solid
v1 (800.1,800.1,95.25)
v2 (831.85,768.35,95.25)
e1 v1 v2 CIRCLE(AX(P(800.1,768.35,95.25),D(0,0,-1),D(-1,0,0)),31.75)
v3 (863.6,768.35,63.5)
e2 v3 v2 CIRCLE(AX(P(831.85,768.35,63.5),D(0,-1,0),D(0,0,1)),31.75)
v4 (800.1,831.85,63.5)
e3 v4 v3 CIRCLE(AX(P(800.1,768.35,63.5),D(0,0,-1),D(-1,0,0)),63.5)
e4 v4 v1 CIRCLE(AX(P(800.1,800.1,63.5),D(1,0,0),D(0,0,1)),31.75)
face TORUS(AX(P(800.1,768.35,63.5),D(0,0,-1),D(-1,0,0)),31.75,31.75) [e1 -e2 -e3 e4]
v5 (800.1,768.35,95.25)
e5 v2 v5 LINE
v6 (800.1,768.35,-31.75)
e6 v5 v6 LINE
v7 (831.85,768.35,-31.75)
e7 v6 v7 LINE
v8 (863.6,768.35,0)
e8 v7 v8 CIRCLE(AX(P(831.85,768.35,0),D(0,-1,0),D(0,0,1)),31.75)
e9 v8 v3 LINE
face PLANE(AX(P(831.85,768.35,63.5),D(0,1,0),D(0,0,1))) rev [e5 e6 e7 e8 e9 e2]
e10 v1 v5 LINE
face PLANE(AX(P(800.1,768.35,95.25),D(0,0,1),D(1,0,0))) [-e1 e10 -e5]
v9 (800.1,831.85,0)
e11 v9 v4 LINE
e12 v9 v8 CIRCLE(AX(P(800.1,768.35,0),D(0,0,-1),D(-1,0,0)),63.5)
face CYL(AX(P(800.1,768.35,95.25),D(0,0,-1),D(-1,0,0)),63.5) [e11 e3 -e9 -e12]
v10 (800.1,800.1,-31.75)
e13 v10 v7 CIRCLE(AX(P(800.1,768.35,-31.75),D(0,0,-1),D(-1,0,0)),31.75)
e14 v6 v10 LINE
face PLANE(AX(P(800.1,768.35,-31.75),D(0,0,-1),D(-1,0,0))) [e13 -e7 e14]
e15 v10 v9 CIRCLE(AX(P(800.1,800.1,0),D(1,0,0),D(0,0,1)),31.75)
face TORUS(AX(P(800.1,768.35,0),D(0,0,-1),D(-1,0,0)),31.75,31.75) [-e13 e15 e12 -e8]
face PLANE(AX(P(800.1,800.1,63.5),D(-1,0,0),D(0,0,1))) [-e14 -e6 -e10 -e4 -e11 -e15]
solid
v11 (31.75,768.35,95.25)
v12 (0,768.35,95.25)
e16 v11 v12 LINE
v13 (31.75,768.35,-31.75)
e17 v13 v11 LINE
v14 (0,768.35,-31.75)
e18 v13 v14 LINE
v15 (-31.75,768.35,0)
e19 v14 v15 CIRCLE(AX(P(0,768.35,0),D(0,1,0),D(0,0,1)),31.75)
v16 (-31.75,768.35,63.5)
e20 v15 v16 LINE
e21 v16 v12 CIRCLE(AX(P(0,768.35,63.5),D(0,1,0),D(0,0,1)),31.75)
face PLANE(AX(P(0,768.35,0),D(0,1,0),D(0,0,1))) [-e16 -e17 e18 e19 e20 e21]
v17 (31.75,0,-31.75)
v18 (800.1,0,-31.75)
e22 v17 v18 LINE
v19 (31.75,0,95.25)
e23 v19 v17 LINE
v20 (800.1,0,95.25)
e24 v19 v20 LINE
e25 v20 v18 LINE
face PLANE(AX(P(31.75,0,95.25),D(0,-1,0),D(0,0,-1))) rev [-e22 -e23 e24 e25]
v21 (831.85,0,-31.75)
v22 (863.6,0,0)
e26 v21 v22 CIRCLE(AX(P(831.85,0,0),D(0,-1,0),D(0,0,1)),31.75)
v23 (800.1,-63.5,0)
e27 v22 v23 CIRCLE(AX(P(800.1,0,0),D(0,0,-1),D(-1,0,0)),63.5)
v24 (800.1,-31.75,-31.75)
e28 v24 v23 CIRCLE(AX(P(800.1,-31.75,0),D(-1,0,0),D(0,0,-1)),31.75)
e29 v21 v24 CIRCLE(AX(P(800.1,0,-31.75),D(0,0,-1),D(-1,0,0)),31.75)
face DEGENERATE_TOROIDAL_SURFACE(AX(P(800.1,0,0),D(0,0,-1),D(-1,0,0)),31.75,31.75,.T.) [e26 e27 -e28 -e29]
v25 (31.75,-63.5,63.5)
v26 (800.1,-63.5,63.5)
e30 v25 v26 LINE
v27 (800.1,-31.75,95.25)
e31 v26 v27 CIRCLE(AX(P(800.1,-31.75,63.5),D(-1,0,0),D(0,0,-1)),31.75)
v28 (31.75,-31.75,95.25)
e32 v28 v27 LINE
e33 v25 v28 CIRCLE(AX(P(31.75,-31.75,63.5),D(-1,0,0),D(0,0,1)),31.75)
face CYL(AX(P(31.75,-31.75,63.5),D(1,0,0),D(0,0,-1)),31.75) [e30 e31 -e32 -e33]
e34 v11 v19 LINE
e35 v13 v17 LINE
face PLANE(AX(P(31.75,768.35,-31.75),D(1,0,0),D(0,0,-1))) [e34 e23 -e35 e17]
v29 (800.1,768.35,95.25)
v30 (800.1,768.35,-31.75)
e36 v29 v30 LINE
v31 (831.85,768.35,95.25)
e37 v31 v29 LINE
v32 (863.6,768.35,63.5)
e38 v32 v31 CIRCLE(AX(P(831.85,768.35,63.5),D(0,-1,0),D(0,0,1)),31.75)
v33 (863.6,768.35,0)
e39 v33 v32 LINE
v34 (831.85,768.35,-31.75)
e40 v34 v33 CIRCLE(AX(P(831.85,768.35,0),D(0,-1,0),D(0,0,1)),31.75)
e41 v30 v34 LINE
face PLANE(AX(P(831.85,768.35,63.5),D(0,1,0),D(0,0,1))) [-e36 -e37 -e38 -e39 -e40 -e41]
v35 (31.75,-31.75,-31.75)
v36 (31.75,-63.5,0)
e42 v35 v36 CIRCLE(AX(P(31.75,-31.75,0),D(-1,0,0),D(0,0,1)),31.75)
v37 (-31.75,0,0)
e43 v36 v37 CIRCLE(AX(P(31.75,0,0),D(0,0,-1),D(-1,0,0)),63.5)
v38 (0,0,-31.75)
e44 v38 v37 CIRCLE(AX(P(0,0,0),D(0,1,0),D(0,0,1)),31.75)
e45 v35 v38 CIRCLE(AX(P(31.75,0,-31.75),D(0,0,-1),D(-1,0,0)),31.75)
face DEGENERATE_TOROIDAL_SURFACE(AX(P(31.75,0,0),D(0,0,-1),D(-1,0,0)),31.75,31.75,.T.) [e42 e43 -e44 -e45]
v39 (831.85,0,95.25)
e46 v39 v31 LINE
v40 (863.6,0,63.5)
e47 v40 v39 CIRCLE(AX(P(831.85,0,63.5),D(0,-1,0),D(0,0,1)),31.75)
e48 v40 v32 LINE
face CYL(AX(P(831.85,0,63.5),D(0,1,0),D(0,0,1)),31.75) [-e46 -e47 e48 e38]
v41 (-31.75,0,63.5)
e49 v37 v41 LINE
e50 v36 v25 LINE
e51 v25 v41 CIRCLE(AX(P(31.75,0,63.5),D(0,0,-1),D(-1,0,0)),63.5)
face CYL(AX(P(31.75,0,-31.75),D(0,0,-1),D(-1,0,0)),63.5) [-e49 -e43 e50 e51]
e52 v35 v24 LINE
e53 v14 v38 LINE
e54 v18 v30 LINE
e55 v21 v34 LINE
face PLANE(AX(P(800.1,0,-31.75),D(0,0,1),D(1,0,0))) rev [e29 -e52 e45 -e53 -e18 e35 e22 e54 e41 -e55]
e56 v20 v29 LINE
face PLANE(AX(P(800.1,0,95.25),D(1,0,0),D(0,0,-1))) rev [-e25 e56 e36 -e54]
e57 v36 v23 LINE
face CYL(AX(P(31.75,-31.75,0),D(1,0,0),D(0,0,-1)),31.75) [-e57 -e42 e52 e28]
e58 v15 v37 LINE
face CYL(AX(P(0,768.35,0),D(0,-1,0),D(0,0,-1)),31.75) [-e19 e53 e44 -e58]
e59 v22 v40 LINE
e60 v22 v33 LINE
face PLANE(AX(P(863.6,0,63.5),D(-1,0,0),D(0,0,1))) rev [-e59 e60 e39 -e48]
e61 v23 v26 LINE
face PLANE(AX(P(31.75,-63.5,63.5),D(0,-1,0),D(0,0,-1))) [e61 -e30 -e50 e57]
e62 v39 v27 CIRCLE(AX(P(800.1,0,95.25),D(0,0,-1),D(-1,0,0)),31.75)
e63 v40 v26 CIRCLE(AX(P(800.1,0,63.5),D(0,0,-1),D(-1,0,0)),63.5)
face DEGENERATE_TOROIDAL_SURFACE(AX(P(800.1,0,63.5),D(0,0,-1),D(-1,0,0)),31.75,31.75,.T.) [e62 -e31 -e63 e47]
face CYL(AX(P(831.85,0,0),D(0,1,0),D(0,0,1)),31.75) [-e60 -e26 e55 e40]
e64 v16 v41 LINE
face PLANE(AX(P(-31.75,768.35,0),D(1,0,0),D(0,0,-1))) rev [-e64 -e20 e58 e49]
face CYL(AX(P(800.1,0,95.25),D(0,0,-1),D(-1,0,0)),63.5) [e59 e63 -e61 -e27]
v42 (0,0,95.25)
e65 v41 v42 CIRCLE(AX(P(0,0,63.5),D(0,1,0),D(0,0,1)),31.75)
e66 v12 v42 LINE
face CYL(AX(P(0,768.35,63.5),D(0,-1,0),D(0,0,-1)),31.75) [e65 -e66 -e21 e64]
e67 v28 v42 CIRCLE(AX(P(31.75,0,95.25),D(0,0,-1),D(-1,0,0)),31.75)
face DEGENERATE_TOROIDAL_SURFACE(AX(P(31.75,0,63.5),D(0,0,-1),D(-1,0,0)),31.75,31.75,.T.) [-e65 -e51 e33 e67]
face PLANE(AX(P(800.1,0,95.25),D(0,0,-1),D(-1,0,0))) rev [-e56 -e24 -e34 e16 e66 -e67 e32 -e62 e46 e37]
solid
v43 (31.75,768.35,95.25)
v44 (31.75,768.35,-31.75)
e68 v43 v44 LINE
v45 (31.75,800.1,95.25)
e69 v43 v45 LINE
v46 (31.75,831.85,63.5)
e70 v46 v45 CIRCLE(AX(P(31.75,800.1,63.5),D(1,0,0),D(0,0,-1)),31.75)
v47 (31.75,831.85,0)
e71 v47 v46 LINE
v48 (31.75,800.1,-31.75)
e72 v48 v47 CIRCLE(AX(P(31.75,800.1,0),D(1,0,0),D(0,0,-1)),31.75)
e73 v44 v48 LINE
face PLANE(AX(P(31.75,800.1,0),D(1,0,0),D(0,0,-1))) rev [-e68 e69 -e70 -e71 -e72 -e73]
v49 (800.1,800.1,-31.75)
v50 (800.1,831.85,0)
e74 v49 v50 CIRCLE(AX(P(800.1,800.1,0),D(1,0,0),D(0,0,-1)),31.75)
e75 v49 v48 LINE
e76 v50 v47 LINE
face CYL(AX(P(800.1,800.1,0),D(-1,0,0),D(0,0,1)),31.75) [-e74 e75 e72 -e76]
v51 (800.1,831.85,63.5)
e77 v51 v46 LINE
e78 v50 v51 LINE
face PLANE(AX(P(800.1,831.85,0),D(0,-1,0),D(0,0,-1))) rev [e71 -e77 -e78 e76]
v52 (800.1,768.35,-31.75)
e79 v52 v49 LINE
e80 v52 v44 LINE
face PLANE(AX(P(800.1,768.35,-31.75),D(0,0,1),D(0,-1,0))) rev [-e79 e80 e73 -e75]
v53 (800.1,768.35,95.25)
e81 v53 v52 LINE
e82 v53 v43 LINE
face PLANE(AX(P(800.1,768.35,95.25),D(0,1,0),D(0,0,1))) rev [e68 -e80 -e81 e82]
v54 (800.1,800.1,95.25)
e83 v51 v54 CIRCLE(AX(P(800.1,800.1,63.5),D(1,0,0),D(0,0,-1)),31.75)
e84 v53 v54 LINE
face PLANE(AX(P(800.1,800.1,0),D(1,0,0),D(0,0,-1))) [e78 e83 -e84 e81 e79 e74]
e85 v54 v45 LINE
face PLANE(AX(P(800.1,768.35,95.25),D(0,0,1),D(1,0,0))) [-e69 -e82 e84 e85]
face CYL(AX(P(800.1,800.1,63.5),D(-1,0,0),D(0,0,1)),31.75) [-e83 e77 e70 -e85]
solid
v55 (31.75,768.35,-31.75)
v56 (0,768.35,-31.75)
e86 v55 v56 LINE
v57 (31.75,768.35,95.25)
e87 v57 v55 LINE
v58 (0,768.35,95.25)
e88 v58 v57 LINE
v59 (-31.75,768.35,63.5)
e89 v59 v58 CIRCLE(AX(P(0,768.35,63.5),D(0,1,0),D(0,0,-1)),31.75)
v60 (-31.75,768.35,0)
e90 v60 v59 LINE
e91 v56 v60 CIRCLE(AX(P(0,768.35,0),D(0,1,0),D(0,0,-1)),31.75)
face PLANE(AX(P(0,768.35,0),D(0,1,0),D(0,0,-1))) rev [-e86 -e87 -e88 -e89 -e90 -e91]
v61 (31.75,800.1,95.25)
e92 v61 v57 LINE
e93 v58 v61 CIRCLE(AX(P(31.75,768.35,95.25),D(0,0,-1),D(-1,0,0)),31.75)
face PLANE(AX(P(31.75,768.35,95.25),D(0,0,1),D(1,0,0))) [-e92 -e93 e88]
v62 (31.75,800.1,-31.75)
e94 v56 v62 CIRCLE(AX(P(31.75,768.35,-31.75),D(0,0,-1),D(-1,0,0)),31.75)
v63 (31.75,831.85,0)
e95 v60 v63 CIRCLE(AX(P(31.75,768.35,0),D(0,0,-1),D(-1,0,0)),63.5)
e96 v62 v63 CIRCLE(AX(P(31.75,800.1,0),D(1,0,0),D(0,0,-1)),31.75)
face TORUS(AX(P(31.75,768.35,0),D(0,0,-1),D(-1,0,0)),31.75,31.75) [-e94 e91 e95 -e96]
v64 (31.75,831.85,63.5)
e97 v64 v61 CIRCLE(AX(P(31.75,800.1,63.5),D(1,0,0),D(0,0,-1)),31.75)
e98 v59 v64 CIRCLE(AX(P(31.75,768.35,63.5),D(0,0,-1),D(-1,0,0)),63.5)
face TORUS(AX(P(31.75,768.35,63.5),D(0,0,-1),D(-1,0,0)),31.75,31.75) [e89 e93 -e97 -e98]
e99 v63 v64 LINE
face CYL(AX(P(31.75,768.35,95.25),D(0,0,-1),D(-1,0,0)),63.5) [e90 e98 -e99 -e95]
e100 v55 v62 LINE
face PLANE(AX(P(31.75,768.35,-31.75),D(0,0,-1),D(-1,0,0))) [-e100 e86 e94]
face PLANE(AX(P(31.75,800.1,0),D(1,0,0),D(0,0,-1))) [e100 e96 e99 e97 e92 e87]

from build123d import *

# Parameters (mm, degrees)
BOSS_EXTRUDE1_DEPTH = 768.35
BOSS_EXTRUDE2_DEPTH = 768.35
BOSS_EXTRUDE3_DEPTH = 768.35
BOSS_EXTRUDE4_DEPTH = 768.35
REVOLVE2_ANGLE      = 90
REVOLVE3_ANGLE      = 90
REVOLVE8_ANGLE      = 90
REVOLVE10_ANGLE     = 90


# Read off the part's stored shape, not the designer's step: Revolve2, Revolve3
with BuildPart() as part:
    # Sketch2 → Boss-Extrude1 (new body)
    with BuildSketch(Plane(origin=(0, 0, 0), x_dir=(1, 0, 0), z_dir=(0, 1, 0))):
        with BuildLine():
            Line((31.75, 31.75), (0, 31.75))
            ThreePointArc((0, 31.75), (-22.450640303, 22.450640303), (-31.75, 0))
            Line((-31.75, 0), (-31.75, -63.5))
            ThreePointArc((-31.75, -63.5), (-22.450640303, -85.950640303), (0, -95.25))
            Line((0, -95.25), (31.75, -95.25))
            Line((31.75, -95.25), (31.75, 31.75))
        make_face()
    extrude(amount=BOSS_EXTRUDE1_DEPTH)



with BuildPart() as body_2:
    # Sketch7 → Boss-Extrude2 (new body)
    with BuildSketch(Plane(origin=(31.75, 0, 0), x_dir=(0, 0, -1), z_dir=(1, 0, 0))):
        with BuildLine():
            Line((31.75, 768.35), (31.75, 800.1))
            ThreePointArc((31.75, 800.1), (22.450640303, 822.550640303), (0, 831.85))
            Line((0, 831.85), (-63.5, 831.85))
            ThreePointArc((-63.5, 831.85), (-85.950640303, 822.550640303), (-95.25, 800.1))
            Line((-95.25, 800.1), (-95.25, 768.35))
            Line((-95.25, 768.35), (31.75, 768.35))
        make_face()
    extrude(amount=BOSS_EXTRUDE2_DEPTH)


with BuildPart() as body_3:
    # Sketch9 → Boss-Extrude3 (new body)
    with BuildSketch(Plane(origin=(0, 768.35, 0), x_dir=(-1, 0, 0), z_dir=(0, -1, 0))):
        with BuildLine():
            Line((-800.1, -95.25), (-800.1, 31.75))
            Line((-800.1, 31.75), (-831.85, 31.75))
            ThreePointArc((-831.85, 31.75), (-854.300640303, 22.450640303), (-863.6, 0))
            Line((-863.6, 0), (-863.6, -63.5))
            ThreePointArc((-863.6, -63.5), (-854.300640303, -85.950640303), (-831.85, -95.25))
            Line((-831.85, -95.25), (-800.1, -95.25))
        make_face()
    extrude(amount=BOSS_EXTRUDE3_DEPTH)


with BuildPart() as body_4:
    # Sketch10 → Boss-Extrude4 (new body)
    with BuildSketch(Plane.ZY.offset(-800.1)):
        with BuildLine():
            Line((95.25, 0), (95.25, -31.75))
            ThreePointArc((95.25, -31.75), (85.950640303, -54.200640303), (63.5, -63.5))
            Line((63.5, -63.5), (0, -63.5))
            ThreePointArc((0, -63.5), (-22.450640303, -54.200640303), (-31.75, -31.75))
            Line((-31.75, -31.75), (-31.75, 0))
            Line((-31.75, 0), (95.25, 0))
        make_face()
    extrude(amount=BOSS_EXTRUDE4_DEPTH)


with BuildPart() as part_1:
    add(part.part)

    add(body_4.part)  # Revolve2 merges body 4
    # Revolve2 outline → Revolve2 (revolve)
    with BuildSketch(Plane(origin=(31.75, 0, 0), x_dir=(-1, 0, 0), z_dir=(0, 1, 0))):
        with BuildLine():
            Line((31.75, 95.25), (0, 95.25))
            Line((0, 95.25), (0, -31.75))
            Line((0, -31.75), (31.75, -31.75))
            ThreePointArc((31.75, -31.75), (54.200640303, -22.450640303), (63.5, 0))
            Line((63.5, 0), (63.5, 63.5))
            ThreePointArc((63.5, 63.5), (54.200640303, 85.950640303), (31.75, 95.25))
        make_face()
    revolve(axis=Axis((31.75, 0, 0), (0, 0, 1)), revolution_arc=REVOLVE2_ANGLE)


    add(body_3.part)  # Revolve3 merges body 3
    # Revolve3 outline → Revolve3 (revolve)
    with BuildSketch(Plane(origin=(800.1, 0, 0), x_dir=(0, -1, 0), z_dir=(-1, 0, 0))):
        with BuildLine():
            Line((0, 95.25), (0, -31.75))
            Line((0, -31.75), (31.75, -31.75))
            ThreePointArc((31.75, -31.75), (54.200640303, -22.450640303), (63.5, 0))
            Line((63.5, 0), (63.5, 63.5))
            ThreePointArc((63.5, 63.5), (54.200640303, 85.950640303), (31.75, 95.25))
            Line((31.75, 95.25), (0, 95.25))
        make_face()
    revolve(axis=Axis((800.1, 0, 0), (0, 0, 1)), revolution_arc=REVOLVE3_ANGLE)


with BuildPart() as body_3_2:
    # Sketch7<3> → Revolve8 (revolve)
    with BuildSketch(Plane(origin=(31.75, 0, 0), x_dir=(0, 0, -1), z_dir=(1, 0, 0))):
        with BuildLine():
            Line((31.75, 768.35), (31.75, 800.1))
            ThreePointArc((31.75, 800.1), (22.450640303, 822.550640303), (0, 831.85))
            Line((0, 831.85), (-63.5, 831.85))
            ThreePointArc((-63.5, 831.85), (-85.950640303, 822.550640303), (-95.25, 800.1))
            Line((-95.25, 800.1), (-95.25, 768.35))
            Line((-95.25, 768.35), (31.75, 768.35))
        make_face()
    revolve(axis=Axis((31.75, 768.35, 95.25), (0, 0, 1)), revolution_arc=REVOLVE8_ANGLE)


with BuildPart() as body_4_2:
    # Sketch9<2> → Revolve10 (revolve)
    with BuildSketch(Plane(origin=(0, 768.35, 0), x_dir=(-1, 0, 0), z_dir=(0, -1, 0))):
        with BuildLine():
            Line((-800.1, -95.25), (-800.1, 31.75))
            Line((-800.1, 31.75), (-831.85, 31.75))
            ThreePointArc((-831.85, 31.75), (-854.300640303, 22.450640303), (-863.6, 0))
            Line((-863.6, 0), (-863.6, -63.5))
            ThreePointArc((-863.6, -63.5), (-854.300640303, -85.950640303), (-831.85, -95.25))
            Line((-831.85, -95.25), (-800.1, -95.25))
        make_face()
    revolve(axis=Axis((800.1, 768.35, 95.25), (0, 0, 1)), revolution_arc=REVOLVE10_ANGLE)


solid = Compound([body_2.part, part_1.part, body_3_2.part, body_4_2.part])
